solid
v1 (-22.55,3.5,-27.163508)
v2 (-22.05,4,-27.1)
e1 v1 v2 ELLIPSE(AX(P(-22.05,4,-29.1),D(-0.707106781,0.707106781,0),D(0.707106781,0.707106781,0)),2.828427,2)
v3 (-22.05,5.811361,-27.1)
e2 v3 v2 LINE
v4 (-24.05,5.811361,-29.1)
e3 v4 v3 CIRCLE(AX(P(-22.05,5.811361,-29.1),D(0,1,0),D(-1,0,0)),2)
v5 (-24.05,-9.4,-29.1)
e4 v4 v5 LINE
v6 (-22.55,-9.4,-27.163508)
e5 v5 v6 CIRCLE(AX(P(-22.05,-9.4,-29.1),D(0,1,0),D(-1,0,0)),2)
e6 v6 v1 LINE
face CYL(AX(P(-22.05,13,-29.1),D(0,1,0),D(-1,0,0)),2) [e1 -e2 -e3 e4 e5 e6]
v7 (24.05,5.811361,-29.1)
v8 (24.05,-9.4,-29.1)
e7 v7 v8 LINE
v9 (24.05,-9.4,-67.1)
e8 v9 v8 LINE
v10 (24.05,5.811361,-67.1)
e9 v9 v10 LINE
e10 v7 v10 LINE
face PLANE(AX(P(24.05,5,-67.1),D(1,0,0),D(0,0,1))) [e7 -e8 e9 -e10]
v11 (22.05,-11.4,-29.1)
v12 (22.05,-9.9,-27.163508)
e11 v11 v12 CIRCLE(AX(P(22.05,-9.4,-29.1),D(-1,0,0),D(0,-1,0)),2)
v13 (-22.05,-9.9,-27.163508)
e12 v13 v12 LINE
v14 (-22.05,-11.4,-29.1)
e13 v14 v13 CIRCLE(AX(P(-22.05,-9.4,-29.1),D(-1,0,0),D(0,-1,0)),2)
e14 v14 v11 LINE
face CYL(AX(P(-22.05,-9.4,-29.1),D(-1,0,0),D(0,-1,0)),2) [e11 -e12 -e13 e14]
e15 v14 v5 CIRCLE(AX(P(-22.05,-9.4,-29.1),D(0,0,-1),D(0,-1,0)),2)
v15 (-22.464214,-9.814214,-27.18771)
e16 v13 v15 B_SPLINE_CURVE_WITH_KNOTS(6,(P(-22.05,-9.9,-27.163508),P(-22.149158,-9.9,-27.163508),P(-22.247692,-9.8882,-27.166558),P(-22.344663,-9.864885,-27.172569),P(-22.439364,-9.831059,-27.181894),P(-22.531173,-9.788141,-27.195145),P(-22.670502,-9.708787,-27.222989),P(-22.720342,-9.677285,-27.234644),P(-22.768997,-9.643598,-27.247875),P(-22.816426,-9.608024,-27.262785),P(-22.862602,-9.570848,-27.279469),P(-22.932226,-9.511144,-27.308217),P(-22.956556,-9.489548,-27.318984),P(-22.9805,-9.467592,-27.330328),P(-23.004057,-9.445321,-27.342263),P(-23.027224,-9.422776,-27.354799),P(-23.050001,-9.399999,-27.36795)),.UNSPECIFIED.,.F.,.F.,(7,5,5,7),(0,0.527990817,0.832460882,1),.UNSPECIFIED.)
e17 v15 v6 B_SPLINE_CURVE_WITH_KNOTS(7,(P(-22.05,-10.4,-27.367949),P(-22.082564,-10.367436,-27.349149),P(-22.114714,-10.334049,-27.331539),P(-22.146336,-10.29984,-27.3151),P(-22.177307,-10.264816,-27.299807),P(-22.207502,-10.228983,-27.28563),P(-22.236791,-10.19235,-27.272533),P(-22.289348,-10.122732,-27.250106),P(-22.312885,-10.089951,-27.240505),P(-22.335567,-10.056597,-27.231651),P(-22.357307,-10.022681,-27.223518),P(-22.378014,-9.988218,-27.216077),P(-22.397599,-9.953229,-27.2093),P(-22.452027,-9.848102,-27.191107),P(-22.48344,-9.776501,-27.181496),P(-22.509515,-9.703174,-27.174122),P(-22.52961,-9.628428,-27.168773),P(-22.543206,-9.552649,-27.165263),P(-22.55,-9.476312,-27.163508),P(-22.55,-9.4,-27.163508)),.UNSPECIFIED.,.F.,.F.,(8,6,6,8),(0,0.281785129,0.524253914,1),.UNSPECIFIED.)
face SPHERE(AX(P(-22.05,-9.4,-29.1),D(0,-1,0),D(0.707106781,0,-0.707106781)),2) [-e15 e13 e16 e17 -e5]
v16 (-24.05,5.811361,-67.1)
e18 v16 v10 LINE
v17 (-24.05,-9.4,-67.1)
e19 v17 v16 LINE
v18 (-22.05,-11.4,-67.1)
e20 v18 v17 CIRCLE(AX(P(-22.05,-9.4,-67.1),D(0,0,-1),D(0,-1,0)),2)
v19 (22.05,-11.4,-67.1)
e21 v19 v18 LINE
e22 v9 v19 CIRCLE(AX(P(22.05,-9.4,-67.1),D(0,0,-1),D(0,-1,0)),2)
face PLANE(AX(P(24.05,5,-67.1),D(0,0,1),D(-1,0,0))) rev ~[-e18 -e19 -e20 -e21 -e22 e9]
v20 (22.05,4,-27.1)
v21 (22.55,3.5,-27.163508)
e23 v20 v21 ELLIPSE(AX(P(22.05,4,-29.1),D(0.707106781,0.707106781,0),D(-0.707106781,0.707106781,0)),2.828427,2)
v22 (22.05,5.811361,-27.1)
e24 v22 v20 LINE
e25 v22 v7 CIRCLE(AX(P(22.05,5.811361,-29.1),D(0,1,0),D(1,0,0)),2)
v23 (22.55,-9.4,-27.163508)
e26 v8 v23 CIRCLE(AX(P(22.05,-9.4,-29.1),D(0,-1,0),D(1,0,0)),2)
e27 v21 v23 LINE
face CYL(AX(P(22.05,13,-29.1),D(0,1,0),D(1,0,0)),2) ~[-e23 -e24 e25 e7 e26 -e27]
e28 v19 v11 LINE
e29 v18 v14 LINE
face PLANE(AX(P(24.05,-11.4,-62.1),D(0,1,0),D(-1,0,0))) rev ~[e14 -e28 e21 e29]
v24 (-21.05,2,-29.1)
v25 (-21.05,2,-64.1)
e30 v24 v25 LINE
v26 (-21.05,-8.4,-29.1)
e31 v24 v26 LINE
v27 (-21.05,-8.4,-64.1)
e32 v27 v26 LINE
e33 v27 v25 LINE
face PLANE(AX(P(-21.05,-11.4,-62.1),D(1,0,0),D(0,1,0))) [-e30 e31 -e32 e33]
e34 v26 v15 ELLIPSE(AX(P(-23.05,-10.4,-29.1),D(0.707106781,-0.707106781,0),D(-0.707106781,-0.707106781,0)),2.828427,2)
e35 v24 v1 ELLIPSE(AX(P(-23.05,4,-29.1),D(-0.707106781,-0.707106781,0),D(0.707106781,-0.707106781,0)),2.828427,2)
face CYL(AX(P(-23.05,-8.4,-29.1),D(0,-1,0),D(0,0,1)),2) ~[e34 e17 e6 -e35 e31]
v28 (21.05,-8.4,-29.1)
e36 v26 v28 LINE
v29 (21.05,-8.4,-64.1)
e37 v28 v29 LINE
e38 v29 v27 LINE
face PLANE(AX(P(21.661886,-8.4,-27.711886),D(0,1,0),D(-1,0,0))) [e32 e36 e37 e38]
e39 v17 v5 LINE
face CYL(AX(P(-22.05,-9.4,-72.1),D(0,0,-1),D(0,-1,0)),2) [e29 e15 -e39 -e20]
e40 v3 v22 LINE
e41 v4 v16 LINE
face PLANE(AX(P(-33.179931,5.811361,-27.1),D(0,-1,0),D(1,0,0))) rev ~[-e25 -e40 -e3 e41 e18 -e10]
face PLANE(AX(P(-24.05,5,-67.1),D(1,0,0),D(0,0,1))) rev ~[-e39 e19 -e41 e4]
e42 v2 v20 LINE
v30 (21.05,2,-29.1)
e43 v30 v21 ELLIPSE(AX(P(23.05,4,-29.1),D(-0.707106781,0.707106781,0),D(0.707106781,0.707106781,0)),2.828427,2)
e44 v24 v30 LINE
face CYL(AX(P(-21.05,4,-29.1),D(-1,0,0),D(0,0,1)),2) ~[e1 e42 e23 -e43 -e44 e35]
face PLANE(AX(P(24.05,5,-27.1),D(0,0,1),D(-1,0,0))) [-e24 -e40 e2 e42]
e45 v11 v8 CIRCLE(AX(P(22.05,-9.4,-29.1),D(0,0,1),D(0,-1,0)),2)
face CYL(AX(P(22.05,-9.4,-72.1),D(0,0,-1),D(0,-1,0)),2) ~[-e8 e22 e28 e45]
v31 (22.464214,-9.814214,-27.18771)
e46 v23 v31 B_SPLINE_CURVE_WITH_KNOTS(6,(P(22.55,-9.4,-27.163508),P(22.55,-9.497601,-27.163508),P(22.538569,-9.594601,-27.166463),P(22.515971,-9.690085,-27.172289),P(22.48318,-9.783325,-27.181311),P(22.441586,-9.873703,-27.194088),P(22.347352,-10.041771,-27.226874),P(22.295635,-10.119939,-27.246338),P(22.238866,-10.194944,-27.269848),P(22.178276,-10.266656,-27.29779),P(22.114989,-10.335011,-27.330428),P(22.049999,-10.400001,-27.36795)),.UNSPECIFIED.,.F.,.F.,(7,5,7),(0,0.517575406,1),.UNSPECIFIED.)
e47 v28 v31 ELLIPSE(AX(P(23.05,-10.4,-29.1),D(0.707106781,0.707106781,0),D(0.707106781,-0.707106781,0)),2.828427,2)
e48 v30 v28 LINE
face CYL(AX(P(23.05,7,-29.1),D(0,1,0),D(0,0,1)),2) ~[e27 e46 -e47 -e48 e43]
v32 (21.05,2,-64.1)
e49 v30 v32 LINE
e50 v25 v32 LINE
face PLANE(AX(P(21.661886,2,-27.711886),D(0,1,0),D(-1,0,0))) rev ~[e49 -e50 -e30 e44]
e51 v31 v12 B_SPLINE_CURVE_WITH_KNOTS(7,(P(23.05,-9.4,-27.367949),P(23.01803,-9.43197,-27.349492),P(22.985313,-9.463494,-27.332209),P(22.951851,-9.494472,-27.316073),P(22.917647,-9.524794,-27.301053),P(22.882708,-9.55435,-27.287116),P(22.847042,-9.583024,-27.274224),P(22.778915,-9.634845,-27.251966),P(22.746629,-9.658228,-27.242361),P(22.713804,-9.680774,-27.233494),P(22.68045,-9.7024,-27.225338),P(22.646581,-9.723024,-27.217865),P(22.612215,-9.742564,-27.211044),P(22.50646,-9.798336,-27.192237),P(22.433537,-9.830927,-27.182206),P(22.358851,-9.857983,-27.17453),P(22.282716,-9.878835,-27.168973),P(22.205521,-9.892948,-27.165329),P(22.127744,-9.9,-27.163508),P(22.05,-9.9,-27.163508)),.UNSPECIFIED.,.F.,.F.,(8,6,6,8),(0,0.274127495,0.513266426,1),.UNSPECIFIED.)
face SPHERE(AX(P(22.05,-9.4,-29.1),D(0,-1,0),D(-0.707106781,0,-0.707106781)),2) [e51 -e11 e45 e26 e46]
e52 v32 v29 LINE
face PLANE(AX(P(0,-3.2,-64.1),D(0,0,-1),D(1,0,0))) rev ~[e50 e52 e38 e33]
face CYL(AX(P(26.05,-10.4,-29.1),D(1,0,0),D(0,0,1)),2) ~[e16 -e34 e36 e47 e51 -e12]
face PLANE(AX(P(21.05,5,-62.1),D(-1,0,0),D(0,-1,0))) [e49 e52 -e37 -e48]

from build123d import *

# Parameters (mm, degrees)
F1_DEPTH      = 6.4
F2_R          = 6.4
F3_DEPTH      = 0.5
F5_DEPTH      = 35
F5_DEPTH_BACK = 5
F6_T          = -3
F7_W          = 48.1
F7_H          = 40
F8_DEPTH      = 10
F9_T1_DEPTH   = 22.4
F9_T3_DEPTH   = 44.1
F9_T5_DEPTH   = 10.4
F9_T7_DEPTH   = 42.1
F9_T9_DEPTH   = 43
F9_S13_W      = 2
F9_S13_H      = 2
F9_T14_DEPTH  = 2
F9_S19_W      = 2
F9_S19_H      = 2
F9_T20_DEPTH  = 2
F9_S25_W      = 2
F9_S25_H      = 2
F9_T26_DEPTH  = 2
F9_S31_W      = 2
F9_S31_H      = 2
F9_T32_DEPTH  = 2
F9_T39_DEPTH  = 15.4
F9_T43_DEPTH  = 47.1
F9_T50_DEPTH  = 15.4
F9_T54_DEPTH  = 47.1
F9_T61_DEPTH  = 47.1
F9_T65_DEPTH  = 15.4
F9_T72_DEPTH  = 15.4
F9_T76_DEPTH  = 47.1
F11_W         = 65.6272098422
F11_H         = 14.6678336896
F12_DEPTH     = 40.001


# Not quite as in the source:
# - a fillet or chamfer that OpenCascade refuses, or shapes differently, is made with other operations: its cross-section is extruded or revolved along the edge and cut away or added


with BuildPart() as f1:
    # F0 (on Front) → F1 (new body)
    with BuildSketch(Plane.XZ):
        with BuildLine():
            ThreePointArc((19.05, 57.1), (17.5855339059, 60.6355339059), (14.05, 62.1))
            Line((14.05, 62.1), (-14.05, 62.1))
            ThreePointArc((-14.05, 62.1), (-17.5855339059, 60.6355339059), (-19.05, 57.1))
            Line((-19.05, 57.1), (-19.05, -57.1))
            ThreePointArc((-19.05, -57.1), (-17.5855339059, -60.6355339059), (-14.05, -62.1))
            Line((-14.05, -62.1), (14.05, -62.1))
            ThreePointArc((14.05, -62.1), (17.5855339059, -60.6355339059), (19.05, -57.1))
            Line((19.05, -57.1), (19.05, 57.1))
        make_face()
    extrude(amount=F1_DEPTH)

    # F2 (on face) → F3 (join)
    with BuildSketch(Plane.XZ.offset(6.4)):
        with BuildLine():
            ThreePointArc((1.6, 0), (8, -6.4), (14.4, 0))
            ThreePointArc((14.4, 0), (8, 6.4), (1.6, 0))
        make_face()
        with BuildLine():
            Line((14.4, -16.1), (14.4, 0))
            ThreePointArc((14.4, 0), (8, -6.4), (1.6, 0))
            Line((1.6, 0), (1.6, -16.1))
            ThreePointArc((1.6, -16.1), (8, -9.7), (14.4, -16.1))
        make_face()
        with BuildLine():
            ThreePointArc((1.6, -16.1), (8, -22.5), (14.4, -16.1))
            ThreePointArc((14.4, -16.1), (8, -9.7), (1.6, -16.1))
        make_face()
        with Locations((8, 16.1)):
            Circle(F2_R)
        with Locations((-8, 16.1)):
            Circle(F2_R)
        with Locations((-8, 0)):
            Circle(F2_R)
        with Locations((-8, -16.1)):
            Circle(F2_R)
    extrude(amount=F3_DEPTH)


with BuildPart() as f5:
    # F4 (on face) → F5 (new body, two sides)
    with BuildSketch(Plane(origin=(0, 0, -62.1), x_dir=(1, 0, 0), z_dir=(0, 0, -1))) as f5_sk:
        Polygon((-14.05, 11.4), (-24.05, 11.4), (-24.05, -5), (-14.05, -5), (14.05, -5), (24.05, -5), (24.05, 11.4), (14.05, 11.4), align=None)
    extrude(amount=-F5_DEPTH)
    extrude(f5_sk.sketch, amount=F5_DEPTH_BACK)

    # F6
    f6_openings = [f5.faces().sort_by_distance(p)[0] for p in [
        (0, -3.2, -27.1),
    ]]
    offset(amount=F6_T, openings=f6_openings)

    # F7 (on face) → F8 (join)
    with BuildSketch(Plane(origin=(0, 5, 0), x_dir=(-1, 0, 0), z_dir=(0, 1, 0))):
        with Locations((0, -47.1)):
            Rectangle(F7_W, F7_H)
    extrude(amount=F8_DEPTH)

    # F9: fillet of radius 2 on 12 edges, made by hand

    # F9_s2 → F9_t1 (cut)
    with BuildSketch(Plane.XZ.offset(-13)):
        with BuildLine():
            ThreePointArc((-24.05, -29.1), (-23.4642135624, -27.6857864376), (-22.05, -27.1))
            Line((-22.05, -27.1), (-24.05, -27.1))
            Line((-24.05, -27.1), (-24.05, -29.1))
        make_face()
        with BuildLine():
            ThreePointArc((24.05, -29.1), (23.4642135624, -27.6857864376), (22.05, -27.1))
            Line((22.05, -27.1), (24.05, -27.1))
            Line((24.05, -27.1), (24.05, -29.1))
        make_face()
    extrude(amount=F9_T1_DEPTH, mode=Mode.SUBTRACT)

    # F9_s4 → F9_t3 (cut)
    with BuildSketch(Plane.YZ.offset(-22.05)):
        with BuildLine():
            ThreePointArc((15, -29.1), (14.4142135624, -27.6857864376), (13, -27.1))
            Line((13, -27.1), (15, -27.1))
            Line((15, -27.1), (15, -29.1))
        make_face()
        with BuildLine():
            ThreePointArc((-11.4, -29.1), (-10.8142135624, -27.6857864376), (-9.4, -27.1))
            Line((-9.4, -27.1), (-11.4, -27.1))
            Line((-11.4, -27.1), (-11.4, -29.1))
        make_face()
    extrude(amount=F9_T3_DEPTH, mode=Mode.SUBTRACT)

    # F9_s6 → F9_t5 (cut)
    with BuildSketch(Plane.XZ.offset(-2)):
        with BuildLine():
            ThreePointArc((-23.05, -27.1), (-21.6357864376, -27.6857864376), (-21.05, -29.1))
            Line((-21.05, -29.1), (-21.05, -27.1))
            Line((-21.05, -27.1), (-23.05, -27.1))
        make_face()
        with BuildLine():
            ThreePointArc((23.05, -27.1), (21.6357864376, -27.6857864376), (21.05, -29.1))
            Line((21.05, -29.1), (21.05, -27.1))
            Line((21.05, -27.1), (23.05, -27.1))
        make_face()
    extrude(amount=F9_T5_DEPTH, mode=Mode.SUBTRACT)

    # F9_s8 → F9_t7 (cut)
    with BuildSketch(Plane.YZ.offset(-21.05)):
        with BuildLine():
            ThreePointArc((-10.4, -27.1), (-8.9857864376, -27.6857864376), (-8.4, -29.1))
            Line((-8.4, -29.1), (-8.4, -27.1))
            Line((-8.4, -27.1), (-10.4, -27.1))
        make_face()
        with BuildLine():
            ThreePointArc((4, -27.1), (2.5857864376, -27.6857864376), (2, -29.1))
            Line((2, -29.1), (2, -27.1))
            Line((2, -27.1), (4, -27.1))
        make_face()
    extrude(amount=F9_T7_DEPTH, mode=Mode.SUBTRACT)

    # F9_s10 → F9_t9 (cut)
    with BuildSketch(Plane.XY.offset(-72.1)):
        with BuildLine():
            ThreePointArc((22.05, -11.4), (23.4642135624, -10.8142135624), (24.05, -9.4))
            Line((24.05, -9.4), (24.05, -11.4))
            Line((24.05, -11.4), (22.05, -11.4))
        make_face()
        with BuildLine():
            ThreePointArc((24.05, 13), (23.4642135624, 14.4142135624), (22.05, 15))
            Line((22.05, 15), (24.05, 15))
            Line((24.05, 15), (24.05, 13))
        make_face()
        with BuildLine():
            ThreePointArc((-22.05, 15), (-23.4642135624, 14.4142135624), (-24.05, 13))
            Line((-24.05, 13), (-24.05, 15))
            Line((-24.05, 15), (-22.05, 15))
        make_face()
        with BuildLine():
            ThreePointArc((-22.05, -11.4), (-23.4642135624, -10.8142135624), (-24.05, -9.4))
            Line((-24.05, -9.4), (-24.05, -11.4))
            Line((-24.05, -11.4), (-22.05, -11.4))
        make_face()
    extrude(amount=F9_T9_DEPTH, mode=Mode.SUBTRACT)


with BuildPart() as f9_tool12:
    # F9_s13 → F9_t14 (new body)
    with BuildSketch(Plane.XZ.offset(-13)):
        with Locations((-23.05, -28.1)):
            Rectangle(F9_S13_W, F9_S13_H)
    extrude(amount=-F9_T14_DEPTH)

    # F9_s15 → F9_t16 (revolve, cut)
    with BuildSketch(Plane(origin=(-22.05, 13, -29.1), x_dir=(0.7071067812, 0, -0.7071067812), z_dir=(0.7071067812, 0, 0.7071067812))):
        with BuildLine():
            ThreePointArc((0, -2), (2, 0), (0, 2))
            Line((0, 2), (0, -2))
        make_face()
    revolve(axis=Axis((-22.05, 13, -29.1), (0, 1, 0)), mode=Mode.SUBTRACT)


with BuildPart() as f5_1:
    add(f5.part)

    # F9_t11: cut F9_tool12
    add(f9_tool12.part, mode=Mode.SUBTRACT)


with BuildPart() as f9_tool18:
    # F9_s19 → F9_t20 (new body)
    with BuildSketch(Plane.XZ.offset(9.4)):
        with Locations((-23.05, -28.1)):
            Rectangle(F9_S19_W, F9_S19_H)
    extrude(amount=F9_T20_DEPTH)

    # F9_s21 → F9_t22 (revolve, cut)
    with BuildSketch(Plane(origin=(-22.05, -9.4, -29.1), x_dir=(0.7071067812, 0, -0.7071067812), z_dir=(-0.7071067812, 0, -0.7071067812))):
        with BuildLine():
            ThreePointArc((0, -2), (2, 0), (0, 2))
            Line((0, 2), (0, -2))
        make_face()
    revolve(axis=Axis((-22.05, -9.4, -29.1), (0, -1, 0)), mode=Mode.SUBTRACT)


with BuildPart() as f5_2:
    add(f5_1.part)

    # F9_t17: cut F9_tool18
    add(f9_tool18.part, mode=Mode.SUBTRACT)


with BuildPart() as f9_tool24:
    # F9_s25 → F9_t26 (new body)
    with BuildSketch(Plane.YZ.offset(22.05)):
        with Locations((14, -28.1)):
            Rectangle(F9_S25_W, F9_S25_H)
    extrude(amount=F9_T26_DEPTH)

    # F9_s27 → F9_t28 (revolve, cut)
    with BuildSketch(Plane(origin=(22.05, 13, -29.1), x_dir=(0, -0.7071067812, -0.7071067812), z_dir=(0, -0.7071067812, 0.7071067812))):
        with BuildLine():
            ThreePointArc((0, -2), (2, 0), (0, 2))
            Line((0, 2), (0, -2))
        make_face()
    revolve(axis=Axis((22.05, 13, -29.1), (1, 0, 0)), mode=Mode.SUBTRACT)


with BuildPart() as f5_3:
    add(f5_2.part)

    # F9_t23: cut F9_tool24
    add(f9_tool24.part, mode=Mode.SUBTRACT)


with BuildPart() as f9_tool30:
    # F9_s31 → F9_t32 (new body)
    with BuildSketch(Plane.XZ.offset(9.4)):
        with Locations((23.05, -28.1)):
            Rectangle(F9_S31_W, F9_S31_H)
    extrude(amount=F9_T32_DEPTH)

    # F9_s33 → F9_t34 (revolve, cut)
    with BuildSketch(Plane(origin=(22.05, -9.4, -29.1), x_dir=(-0.7071067812, 0, -0.7071067812), z_dir=(-0.7071067812, 0, 0.7071067812))):
        with BuildLine():
            ThreePointArc((0, -2), (2, 0), (0, 2))
            Line((0, 2), (0, -2))
        make_face()
    revolve(axis=Axis((22.05, -9.4, -29.1), (0, -1, 0)), mode=Mode.SUBTRACT)


with BuildPart() as f5_4:
    add(f5_3.part)

    # F9_t29: cut F9_tool30
    add(f9_tool30.part, mode=Mode.SUBTRACT)


with BuildPart() as f9_tool37:
    # F9_s38 → F9_t39 (new body)
    with BuildSketch(Plane.XZ.offset(13.4)):
        with BuildLine():
            ThreePointArc((-23.05, -27.1), (-21.6357864376, -27.6857864376), (-21.05, -29.1))
            Line((-21.05, -29.1), (-21.05, -27.1))
            Line((-21.05, -27.1), (-23.05, -27.1))
        make_face()
    extrude(amount=-F9_T39_DEPTH)

    split(bisect_by=Plane.XZ.offset(8.4), keep=Keep.TOP)


with BuildPart() as f9_tool41:
    # F9_s42 → F9_t43 (new body)
    with BuildSketch(Plane.YZ.offset(21.05)):
        with BuildLine():
            ThreePointArc((-10.4, -27.1), (-8.9857864376, -27.6857864376), (-8.4, -29.1))
            Line((-8.4, -29.1), (-8.4, -27.1))
            Line((-8.4, -27.1), (-10.4, -27.1))
        make_face()
    extrude(amount=-F9_T43_DEPTH)

    split(bisect_by=Plane.YZ.offset(-21.05), keep=Keep.BOTTOM)


with BuildPart() as f9_tool37_1:
    add(f9_tool37.part)

    # F9_t45: intersect F9_tool41
    add(f9_tool41.part, mode=Mode.INTERSECT)


with BuildPart() as f5_5:
    add(f5_4.part)

    # F9_t35: cut F9_tool37
    add(f9_tool37_1.part, mode=Mode.SUBTRACT)


with BuildPart() as f9_tool48:
    # F9_s49 → F9_t50 (new body)
    with BuildSketch(Plane.XZ.offset(8.4)):
        with BuildLine():
            ThreePointArc((-23.05, -27.1), (-21.6357864376, -27.6857864376), (-21.05, -29.1))
            Line((-21.05, -29.1), (-21.05, -27.1))
            Line((-21.05, -27.1), (-23.05, -27.1))
        make_face()
    extrude(amount=-F9_T50_DEPTH)

    split(bisect_by=Plane.XZ.offset(-2), keep=Keep.BOTTOM)


with BuildPart() as f9_tool52:
    # F9_s53 → F9_t54 (new body)
    with BuildSketch(Plane.YZ.offset(-26.05)):
        with BuildLine():
            ThreePointArc((4, -27.1), (2.5857864376, -27.6857864376), (2, -29.1))
            Line((2, -29.1), (2, -27.1))
            Line((2, -27.1), (4, -27.1))
        make_face()
    extrude(amount=F9_T54_DEPTH)

    split(bisect_by=Plane.YZ.offset(-21.05), keep=Keep.BOTTOM)


with BuildPart() as f9_tool48_1:
    add(f9_tool48.part)

    # F9_t56: intersect F9_tool52
    add(f9_tool52.part, mode=Mode.INTERSECT)


with BuildPart() as f5_6:
    add(f5_5.part)

    # F9_t46: cut F9_tool48
    add(f9_tool48_1.part, mode=Mode.SUBTRACT)


with BuildPart() as f9_tool59:
    # F9_s60 → F9_t61 (new body)
    with BuildSketch(Plane.YZ.offset(26.05)):
        with BuildLine():
            ThreePointArc((-10.4, -27.1), (-8.9857864376, -27.6857864376), (-8.4, -29.1))
            Line((-8.4, -29.1), (-8.4, -27.1))
            Line((-8.4, -27.1), (-10.4, -27.1))
        make_face()
    extrude(amount=-F9_T61_DEPTH)

    split(bisect_by=Plane.YZ.offset(21.05), keep=Keep.TOP)


with BuildPart() as f9_tool63:
    # F9_s64 → F9_t65 (new body)
    with BuildSketch(Plane.XZ.offset(-2)):
        with BuildLine():
            ThreePointArc((23.05, -27.1), (21.6357864376, -27.6857864376), (21.05, -29.1))
            Line((21.05, -29.1), (21.05, -27.1))
            Line((21.05, -27.1), (23.05, -27.1))
        make_face()
    extrude(amount=F9_T65_DEPTH)

    split(bisect_by=Plane.XZ.offset(8.4), keep=Keep.TOP)


with BuildPart() as f9_tool59_1:
    add(f9_tool59.part)

    # F9_t67: intersect F9_tool63
    add(f9_tool63.part, mode=Mode.INTERSECT)


with BuildPart() as f5_7:
    add(f5_6.part)

    # F9_t57: cut F9_tool59
    add(f9_tool59_1.part, mode=Mode.SUBTRACT)


with BuildPart() as f9_tool70:
    # F9_s71 → F9_t72 (new body)
    with BuildSketch(Plane.XZ.offset(-7)):
        with BuildLine():
            ThreePointArc((23.05, -27.1), (21.6357864376, -27.6857864376), (21.05, -29.1))
            Line((21.05, -29.1), (21.05, -27.1))
            Line((21.05, -27.1), (23.05, -27.1))
        make_face()
    extrude(amount=F9_T72_DEPTH)

    split(bisect_by=Plane.XZ.offset(-2), keep=Keep.BOTTOM)


with BuildPart() as f9_tool74:
    # F9_s75 → F9_t76 (new body)
    with BuildSketch(Plane.YZ.offset(-21.05)):
        with BuildLine():
            ThreePointArc((4, -27.1), (2.5857864376, -27.6857864376), (2, -29.1))
            Line((2, -29.1), (2, -27.1))
            Line((2, -27.1), (4, -27.1))
        make_face()
    extrude(amount=F9_T76_DEPTH)

    split(bisect_by=Plane.YZ.offset(21.05), keep=Keep.TOP)


with BuildPart() as f9_tool70_1:
    add(f9_tool70.part)

    # F9_t78: intersect F9_tool74
    add(f9_tool74.part, mode=Mode.INTERSECT)


with BuildPart() as f5_8:
    add(f5_7.part)

    # F9_t68: cut F9_tool70
    add(f9_tool70_1.part, mode=Mode.SUBTRACT)

    # F11 (on face) → F12 (cut, through all)
    with BuildSketch(Plane.XY.offset(-27.1)):
        with Locations((-0.3663264215, 13.1452779751)):
            Rectangle(F11_W, F11_H)
    extrude(amount=-F12_DEPTH, mode=Mode.SUBTRACT)


solid = f5_8.part
